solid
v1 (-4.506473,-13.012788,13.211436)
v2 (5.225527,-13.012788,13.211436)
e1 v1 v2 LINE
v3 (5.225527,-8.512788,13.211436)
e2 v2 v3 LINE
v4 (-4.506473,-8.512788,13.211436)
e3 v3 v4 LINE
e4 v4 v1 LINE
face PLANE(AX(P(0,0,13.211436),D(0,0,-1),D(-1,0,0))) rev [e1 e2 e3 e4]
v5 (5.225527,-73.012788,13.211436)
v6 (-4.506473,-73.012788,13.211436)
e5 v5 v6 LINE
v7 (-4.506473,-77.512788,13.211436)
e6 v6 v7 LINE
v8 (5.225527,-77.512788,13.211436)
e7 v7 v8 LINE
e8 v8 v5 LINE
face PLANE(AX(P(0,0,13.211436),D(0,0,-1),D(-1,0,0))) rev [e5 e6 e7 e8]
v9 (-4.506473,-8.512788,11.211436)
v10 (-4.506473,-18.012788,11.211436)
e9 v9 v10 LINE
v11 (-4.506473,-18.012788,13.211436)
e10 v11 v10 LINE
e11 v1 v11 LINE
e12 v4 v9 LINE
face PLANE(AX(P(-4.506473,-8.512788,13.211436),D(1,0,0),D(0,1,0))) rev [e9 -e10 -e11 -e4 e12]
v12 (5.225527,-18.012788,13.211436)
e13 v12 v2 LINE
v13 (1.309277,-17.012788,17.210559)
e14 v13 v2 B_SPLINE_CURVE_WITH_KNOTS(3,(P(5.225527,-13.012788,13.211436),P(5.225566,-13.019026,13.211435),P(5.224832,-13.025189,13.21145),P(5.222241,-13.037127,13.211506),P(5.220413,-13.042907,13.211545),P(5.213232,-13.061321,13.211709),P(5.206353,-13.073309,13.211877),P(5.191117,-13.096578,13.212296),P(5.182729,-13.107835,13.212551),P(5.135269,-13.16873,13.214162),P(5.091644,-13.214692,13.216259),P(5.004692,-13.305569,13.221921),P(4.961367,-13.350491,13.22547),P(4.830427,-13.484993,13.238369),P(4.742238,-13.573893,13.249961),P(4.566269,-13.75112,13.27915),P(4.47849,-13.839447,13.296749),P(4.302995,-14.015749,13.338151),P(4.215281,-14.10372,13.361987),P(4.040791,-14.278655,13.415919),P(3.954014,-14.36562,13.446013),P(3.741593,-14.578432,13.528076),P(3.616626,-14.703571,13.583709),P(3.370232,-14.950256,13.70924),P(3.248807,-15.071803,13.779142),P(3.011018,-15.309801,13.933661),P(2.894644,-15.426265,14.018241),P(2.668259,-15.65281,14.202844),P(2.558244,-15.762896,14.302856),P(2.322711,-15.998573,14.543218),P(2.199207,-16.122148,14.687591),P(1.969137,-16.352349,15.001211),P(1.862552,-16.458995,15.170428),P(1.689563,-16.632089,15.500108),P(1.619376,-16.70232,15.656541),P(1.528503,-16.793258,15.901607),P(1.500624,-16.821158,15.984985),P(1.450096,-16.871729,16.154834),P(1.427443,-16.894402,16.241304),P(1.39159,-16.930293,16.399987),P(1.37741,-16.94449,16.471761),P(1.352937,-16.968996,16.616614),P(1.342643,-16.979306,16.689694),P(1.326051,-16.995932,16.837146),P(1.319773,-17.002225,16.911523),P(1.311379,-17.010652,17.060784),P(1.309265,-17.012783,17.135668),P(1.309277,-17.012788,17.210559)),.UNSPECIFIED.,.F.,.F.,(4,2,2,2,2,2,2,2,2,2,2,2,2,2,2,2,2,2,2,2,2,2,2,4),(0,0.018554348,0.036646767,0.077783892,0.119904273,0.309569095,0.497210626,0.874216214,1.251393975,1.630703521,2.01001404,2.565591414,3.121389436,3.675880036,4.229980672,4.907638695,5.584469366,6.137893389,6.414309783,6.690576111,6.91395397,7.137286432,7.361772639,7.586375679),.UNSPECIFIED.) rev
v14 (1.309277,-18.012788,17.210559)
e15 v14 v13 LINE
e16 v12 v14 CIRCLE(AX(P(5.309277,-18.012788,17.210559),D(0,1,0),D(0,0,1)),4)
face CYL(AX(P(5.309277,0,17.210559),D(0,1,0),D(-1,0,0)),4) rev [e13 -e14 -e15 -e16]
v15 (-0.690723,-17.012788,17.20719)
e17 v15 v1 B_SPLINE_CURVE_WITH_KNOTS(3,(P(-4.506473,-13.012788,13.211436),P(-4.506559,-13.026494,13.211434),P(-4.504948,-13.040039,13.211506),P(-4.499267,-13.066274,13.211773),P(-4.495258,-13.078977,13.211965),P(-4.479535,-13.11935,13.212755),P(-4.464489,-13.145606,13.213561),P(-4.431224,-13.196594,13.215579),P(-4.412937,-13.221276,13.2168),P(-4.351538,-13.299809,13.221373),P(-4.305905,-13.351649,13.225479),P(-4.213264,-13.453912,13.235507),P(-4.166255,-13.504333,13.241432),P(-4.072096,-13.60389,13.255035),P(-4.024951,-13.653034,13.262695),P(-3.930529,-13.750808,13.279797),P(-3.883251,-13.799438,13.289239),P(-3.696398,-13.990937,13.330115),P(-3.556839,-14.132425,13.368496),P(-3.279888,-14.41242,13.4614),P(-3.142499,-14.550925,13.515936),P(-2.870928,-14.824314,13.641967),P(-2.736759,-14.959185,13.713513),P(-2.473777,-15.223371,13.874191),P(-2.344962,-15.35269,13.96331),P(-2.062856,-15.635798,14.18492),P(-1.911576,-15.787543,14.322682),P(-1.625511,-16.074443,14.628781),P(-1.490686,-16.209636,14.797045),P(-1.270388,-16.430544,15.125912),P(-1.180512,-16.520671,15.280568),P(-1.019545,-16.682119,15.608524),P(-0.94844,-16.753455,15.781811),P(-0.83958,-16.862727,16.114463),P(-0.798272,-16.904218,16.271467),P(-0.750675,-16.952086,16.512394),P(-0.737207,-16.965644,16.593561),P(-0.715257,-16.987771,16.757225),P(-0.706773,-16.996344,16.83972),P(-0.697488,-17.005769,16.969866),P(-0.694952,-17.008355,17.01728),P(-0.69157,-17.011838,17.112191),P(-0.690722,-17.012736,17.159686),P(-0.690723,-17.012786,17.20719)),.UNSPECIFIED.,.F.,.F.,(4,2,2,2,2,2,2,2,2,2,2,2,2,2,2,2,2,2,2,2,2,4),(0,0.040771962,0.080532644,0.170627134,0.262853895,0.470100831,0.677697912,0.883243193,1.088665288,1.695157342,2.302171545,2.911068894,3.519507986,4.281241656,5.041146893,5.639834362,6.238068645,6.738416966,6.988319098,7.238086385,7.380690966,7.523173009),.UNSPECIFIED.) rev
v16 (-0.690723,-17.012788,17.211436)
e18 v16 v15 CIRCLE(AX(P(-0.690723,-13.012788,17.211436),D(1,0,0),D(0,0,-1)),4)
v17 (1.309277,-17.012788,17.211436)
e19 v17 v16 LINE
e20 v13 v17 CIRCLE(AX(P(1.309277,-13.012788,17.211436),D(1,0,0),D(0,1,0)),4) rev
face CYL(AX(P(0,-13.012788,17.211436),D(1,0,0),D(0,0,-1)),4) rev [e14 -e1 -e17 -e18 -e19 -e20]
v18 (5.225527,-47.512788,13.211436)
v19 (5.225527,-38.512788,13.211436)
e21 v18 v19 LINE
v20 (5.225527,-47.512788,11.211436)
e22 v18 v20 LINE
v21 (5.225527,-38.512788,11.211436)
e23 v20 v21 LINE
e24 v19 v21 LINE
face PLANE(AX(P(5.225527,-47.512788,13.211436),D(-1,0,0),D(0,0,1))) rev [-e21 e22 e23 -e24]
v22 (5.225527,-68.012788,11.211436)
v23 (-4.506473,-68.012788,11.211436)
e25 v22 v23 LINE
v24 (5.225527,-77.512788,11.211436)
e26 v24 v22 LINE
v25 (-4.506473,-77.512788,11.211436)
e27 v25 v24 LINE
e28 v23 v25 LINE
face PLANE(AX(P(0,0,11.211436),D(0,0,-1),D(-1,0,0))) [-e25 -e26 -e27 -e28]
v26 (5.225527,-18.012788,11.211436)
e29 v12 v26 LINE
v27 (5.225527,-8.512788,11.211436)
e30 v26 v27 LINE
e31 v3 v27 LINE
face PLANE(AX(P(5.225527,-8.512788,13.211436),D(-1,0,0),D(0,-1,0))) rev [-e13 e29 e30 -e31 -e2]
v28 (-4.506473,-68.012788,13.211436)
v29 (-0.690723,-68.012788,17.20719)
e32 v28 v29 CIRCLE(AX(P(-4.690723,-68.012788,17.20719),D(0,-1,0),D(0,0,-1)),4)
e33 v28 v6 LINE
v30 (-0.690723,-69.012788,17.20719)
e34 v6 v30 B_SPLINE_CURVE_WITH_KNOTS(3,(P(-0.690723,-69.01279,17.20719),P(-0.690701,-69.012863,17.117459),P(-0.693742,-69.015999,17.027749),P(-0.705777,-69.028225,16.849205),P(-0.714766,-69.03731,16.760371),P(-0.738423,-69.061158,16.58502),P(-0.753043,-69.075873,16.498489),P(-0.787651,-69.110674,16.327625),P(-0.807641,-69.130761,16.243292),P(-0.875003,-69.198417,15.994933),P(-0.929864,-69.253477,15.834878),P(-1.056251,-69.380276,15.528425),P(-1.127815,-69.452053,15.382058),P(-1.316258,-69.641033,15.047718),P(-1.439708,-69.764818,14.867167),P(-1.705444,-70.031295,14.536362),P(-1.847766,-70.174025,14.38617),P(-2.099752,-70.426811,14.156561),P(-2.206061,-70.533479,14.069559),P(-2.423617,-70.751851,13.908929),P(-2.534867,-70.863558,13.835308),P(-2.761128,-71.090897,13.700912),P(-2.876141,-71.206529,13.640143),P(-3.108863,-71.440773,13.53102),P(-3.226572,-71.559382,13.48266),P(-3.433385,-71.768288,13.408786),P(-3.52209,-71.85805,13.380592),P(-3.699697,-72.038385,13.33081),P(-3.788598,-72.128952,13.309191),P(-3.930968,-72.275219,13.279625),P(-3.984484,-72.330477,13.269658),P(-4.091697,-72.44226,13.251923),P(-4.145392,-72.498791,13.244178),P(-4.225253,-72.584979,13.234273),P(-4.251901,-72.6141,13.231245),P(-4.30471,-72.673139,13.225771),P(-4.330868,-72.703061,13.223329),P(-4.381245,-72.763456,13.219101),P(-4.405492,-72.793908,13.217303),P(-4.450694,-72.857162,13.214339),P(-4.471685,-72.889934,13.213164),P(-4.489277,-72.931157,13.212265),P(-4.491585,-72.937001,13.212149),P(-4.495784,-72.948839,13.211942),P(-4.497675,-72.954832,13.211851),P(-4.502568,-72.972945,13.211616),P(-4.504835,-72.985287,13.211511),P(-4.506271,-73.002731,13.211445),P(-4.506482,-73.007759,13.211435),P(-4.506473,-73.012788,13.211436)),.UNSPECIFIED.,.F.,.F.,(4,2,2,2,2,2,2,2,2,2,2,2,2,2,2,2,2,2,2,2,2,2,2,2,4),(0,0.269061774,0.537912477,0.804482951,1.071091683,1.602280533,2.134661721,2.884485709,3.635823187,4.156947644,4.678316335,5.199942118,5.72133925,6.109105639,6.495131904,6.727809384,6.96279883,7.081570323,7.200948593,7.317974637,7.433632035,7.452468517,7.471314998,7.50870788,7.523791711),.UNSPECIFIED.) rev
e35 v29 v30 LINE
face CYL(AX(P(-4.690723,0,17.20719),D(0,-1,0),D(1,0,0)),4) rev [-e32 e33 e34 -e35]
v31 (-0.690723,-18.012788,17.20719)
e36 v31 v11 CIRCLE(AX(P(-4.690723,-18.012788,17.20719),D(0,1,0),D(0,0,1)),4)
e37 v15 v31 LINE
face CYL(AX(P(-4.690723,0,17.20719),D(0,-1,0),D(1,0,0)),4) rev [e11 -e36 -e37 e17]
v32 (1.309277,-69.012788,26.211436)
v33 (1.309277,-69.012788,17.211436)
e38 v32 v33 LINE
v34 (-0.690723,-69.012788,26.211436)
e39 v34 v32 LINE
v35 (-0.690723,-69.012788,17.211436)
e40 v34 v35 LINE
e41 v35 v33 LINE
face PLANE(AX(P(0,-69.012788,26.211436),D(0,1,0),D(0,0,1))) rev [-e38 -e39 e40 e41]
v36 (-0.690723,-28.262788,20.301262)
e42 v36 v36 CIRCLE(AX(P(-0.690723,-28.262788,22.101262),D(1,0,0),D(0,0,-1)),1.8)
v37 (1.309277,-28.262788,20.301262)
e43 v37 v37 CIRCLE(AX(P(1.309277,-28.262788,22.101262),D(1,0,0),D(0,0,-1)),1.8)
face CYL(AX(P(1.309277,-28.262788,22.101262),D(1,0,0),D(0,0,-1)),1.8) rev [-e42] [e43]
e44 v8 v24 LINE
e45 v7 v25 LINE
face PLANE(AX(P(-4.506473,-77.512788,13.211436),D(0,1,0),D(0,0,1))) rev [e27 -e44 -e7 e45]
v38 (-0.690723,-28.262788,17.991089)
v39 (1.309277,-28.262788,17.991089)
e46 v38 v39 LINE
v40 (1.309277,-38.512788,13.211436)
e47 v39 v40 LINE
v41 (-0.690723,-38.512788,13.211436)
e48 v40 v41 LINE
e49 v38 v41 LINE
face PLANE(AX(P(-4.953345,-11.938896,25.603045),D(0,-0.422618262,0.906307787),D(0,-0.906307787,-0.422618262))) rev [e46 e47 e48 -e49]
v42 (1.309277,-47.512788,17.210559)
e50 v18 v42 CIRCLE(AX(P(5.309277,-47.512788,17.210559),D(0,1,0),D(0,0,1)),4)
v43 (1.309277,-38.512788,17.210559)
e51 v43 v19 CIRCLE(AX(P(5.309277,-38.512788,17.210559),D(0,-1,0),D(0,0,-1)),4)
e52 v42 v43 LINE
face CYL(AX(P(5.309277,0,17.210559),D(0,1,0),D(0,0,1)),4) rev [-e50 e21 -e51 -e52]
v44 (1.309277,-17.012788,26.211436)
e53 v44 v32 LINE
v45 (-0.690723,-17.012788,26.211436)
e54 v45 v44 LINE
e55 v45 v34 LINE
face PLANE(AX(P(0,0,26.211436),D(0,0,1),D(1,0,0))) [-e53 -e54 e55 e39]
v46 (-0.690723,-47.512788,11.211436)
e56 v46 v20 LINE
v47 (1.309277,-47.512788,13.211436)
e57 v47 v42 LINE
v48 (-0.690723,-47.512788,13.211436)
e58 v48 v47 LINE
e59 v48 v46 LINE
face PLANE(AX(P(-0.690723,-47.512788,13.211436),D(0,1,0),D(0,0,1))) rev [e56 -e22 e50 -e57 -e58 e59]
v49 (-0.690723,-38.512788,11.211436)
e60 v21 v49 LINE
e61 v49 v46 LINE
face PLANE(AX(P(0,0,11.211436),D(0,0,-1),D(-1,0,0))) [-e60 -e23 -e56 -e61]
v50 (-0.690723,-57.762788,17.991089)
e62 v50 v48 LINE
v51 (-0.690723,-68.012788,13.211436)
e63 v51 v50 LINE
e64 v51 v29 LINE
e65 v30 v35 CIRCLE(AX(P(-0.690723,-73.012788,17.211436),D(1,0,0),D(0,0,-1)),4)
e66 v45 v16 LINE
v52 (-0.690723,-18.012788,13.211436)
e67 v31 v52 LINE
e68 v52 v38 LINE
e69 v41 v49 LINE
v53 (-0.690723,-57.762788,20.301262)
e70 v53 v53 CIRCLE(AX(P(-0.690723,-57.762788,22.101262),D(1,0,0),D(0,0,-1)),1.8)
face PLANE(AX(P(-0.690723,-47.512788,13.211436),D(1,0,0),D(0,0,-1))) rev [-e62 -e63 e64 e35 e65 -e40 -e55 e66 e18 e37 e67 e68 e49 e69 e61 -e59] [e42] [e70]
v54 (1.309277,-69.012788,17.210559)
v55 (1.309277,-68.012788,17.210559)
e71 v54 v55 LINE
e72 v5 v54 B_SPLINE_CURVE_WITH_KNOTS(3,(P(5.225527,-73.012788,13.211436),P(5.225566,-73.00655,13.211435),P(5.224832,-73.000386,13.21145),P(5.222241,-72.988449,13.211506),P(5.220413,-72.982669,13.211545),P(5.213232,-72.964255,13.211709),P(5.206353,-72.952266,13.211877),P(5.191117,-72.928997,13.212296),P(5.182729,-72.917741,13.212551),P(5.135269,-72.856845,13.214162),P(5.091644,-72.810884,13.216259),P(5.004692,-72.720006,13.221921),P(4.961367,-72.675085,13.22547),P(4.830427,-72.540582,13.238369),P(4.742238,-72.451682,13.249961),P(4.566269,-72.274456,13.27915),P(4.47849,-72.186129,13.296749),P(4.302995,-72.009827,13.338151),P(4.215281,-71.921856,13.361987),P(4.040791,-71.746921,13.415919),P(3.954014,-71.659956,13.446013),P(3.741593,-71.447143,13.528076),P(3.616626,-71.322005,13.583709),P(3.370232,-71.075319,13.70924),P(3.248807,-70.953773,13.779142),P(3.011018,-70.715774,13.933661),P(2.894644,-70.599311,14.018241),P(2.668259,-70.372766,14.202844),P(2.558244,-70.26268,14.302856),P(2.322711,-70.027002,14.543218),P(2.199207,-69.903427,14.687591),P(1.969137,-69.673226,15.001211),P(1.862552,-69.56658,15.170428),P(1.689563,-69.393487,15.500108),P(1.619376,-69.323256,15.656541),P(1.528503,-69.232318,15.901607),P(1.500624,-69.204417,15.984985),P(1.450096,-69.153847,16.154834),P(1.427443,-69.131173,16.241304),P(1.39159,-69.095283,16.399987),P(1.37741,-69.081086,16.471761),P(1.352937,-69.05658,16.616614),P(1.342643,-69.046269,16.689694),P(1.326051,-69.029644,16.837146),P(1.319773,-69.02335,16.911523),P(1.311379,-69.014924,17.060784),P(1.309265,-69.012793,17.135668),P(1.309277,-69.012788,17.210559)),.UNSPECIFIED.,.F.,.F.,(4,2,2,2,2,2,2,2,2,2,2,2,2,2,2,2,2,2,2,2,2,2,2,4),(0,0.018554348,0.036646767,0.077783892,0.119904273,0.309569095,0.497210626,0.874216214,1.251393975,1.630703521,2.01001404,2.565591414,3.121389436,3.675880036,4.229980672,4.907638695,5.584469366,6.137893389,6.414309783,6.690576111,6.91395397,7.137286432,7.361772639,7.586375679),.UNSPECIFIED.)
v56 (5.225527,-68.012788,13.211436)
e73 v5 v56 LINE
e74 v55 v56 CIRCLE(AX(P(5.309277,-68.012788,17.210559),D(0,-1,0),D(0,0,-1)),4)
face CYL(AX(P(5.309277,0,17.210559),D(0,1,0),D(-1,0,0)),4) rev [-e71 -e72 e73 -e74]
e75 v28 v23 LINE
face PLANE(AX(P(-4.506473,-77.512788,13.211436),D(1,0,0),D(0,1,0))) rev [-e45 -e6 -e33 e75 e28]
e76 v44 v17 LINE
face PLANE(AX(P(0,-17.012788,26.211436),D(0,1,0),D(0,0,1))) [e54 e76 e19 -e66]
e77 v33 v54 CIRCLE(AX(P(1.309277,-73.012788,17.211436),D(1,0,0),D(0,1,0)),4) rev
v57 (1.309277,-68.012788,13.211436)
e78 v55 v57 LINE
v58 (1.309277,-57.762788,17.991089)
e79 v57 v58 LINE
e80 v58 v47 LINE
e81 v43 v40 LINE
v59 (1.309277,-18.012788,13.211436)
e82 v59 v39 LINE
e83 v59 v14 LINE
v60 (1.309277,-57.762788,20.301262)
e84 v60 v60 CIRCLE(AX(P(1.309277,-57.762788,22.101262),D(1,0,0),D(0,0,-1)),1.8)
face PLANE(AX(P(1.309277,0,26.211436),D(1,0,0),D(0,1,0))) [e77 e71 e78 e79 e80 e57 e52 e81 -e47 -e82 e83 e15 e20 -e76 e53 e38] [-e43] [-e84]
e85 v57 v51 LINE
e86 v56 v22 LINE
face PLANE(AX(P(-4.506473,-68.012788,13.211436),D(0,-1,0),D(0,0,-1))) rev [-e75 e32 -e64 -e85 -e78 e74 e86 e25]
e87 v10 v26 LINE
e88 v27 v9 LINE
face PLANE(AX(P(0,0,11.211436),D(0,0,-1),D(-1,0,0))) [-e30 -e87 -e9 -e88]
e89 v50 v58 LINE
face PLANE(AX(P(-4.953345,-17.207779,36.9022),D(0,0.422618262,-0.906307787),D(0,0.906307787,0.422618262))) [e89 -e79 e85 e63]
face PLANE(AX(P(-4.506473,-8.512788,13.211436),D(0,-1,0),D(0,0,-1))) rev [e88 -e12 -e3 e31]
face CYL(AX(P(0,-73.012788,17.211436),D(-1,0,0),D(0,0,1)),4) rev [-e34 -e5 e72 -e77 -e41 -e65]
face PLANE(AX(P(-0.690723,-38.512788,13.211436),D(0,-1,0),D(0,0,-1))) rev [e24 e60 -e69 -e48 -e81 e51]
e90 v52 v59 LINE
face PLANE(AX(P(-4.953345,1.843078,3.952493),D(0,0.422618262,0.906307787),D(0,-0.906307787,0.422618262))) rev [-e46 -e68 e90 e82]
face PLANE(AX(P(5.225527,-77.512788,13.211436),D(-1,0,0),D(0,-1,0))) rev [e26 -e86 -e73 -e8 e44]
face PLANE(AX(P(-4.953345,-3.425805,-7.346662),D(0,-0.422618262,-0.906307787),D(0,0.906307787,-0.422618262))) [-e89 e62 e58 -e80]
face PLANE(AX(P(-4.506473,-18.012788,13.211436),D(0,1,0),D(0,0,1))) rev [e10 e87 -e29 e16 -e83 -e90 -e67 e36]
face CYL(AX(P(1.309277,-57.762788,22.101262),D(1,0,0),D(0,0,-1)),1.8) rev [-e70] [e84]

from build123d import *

# Parameters (mm, degrees)
SKETCH2_W             = 5.91625
SKETCH2_H             = 9
BOSS_EXTRUDE1_DEPTH   = 2
SKETCH2_W_2           = 9.732
SKETCH2_H_2           = 9.5
BOSS_EXTRUDE1_2_DEPTH = 2
BOSS_EXTRUDE1_3_DEPTH = 2
SKETCH3_W             = 2
SKETCH3_H             = 1
BOSS_EXTRUDE2_DEPTH   = 13
FILLET1_R             = 4
CUT_EXTRUDE1_DEPTH    = 83.031058661
M3_CLEARANCE_HOLE2_D  = 3.6


with BuildPart() as part:
    # Sketch2 → Boss-Extrude1 (new body)
    with BuildSketch(Plane.XY.offset(11.211435671)):
        with Locations((2.267401673, -43.012787822)):
            Rectangle(SKETCH2_W, SKETCH2_H)
    extrude(amount=BOSS_EXTRUDE1_DEPTH)



with BuildPart() as body_2:
    # Sketch2 → Boss-Extrude1 2 (new body)
    with BuildSketch(Plane.XY.offset(11.211435671)):
        with Locations((0.359526673, -72.762787822)):
            Rectangle(SKETCH2_W_2, SKETCH2_H_2)
    extrude(amount=BOSS_EXTRUDE1_2_DEPTH)


with BuildPart() as body_3:
    # Sketch2 → Boss-Extrude1 3 (new body)
    with BuildSketch(Plane.XY.offset(11.211435671)):
        with Locations((0.359526673, -13.262787822)):
            Rectangle(SKETCH2_W_2, SKETCH2_H_2)
    extrude(amount=BOSS_EXTRUDE1_3_DEPTH)


with BuildPart() as part_1:
    add(part.part)

    add(body_2.part)  # Boss-Extrude2 merges body 2

    add(body_3.part)  # Boss-Extrude2 merges body 3
    # Sketch3 → Boss-Extrude2 (add)
    with BuildSketch(Plane.XY.offset(13.211435671)):
        Polygon((-0.690723327, -17.012787822), (-0.690723327, -38.512787822), (-0.690723327, -47.512787822), (-0.690723327, -68.012787822), (1.309276673, -68.012787822), (1.309276673, -17.012787822), align=None)
        with Locations((0.309276673, -68.512787822)):
            Rectangle(SKETCH3_W, SKETCH3_H)
    extrude(amount=BOSS_EXTRUDE2_DEPTH)

    # Fillet1
    # the kernel refuses this fillet: 4 mm, written as the material it adds along each edge
    with BuildSketch(Plane(origin=(-0.690723327, -17.012787822, 13.211435671), x_dir=(0, 0, 1), z_dir=(0, -1, 0)), Plane(origin=(-0.690723327, -68.012787822, 13.211435671), x_dir=(0, 0, 1), z_dir=(0, -1, 0))) as fillet1_piece_1:
        with BuildLine():
            CenterArc((3.995754239, 4), FILLET1_R, 182.64012102, 87.35987898)
            Line((0, 3.81575), (0, 0))
            Line((0, 0), (3.995754239, 0))
        make_face()
    extrude(amount=1)
    with BuildSketch(Plane(origin=(1.309276673, -17.012787822, 13.211435671), x_dir=(0, 1, 0), z_dir=(-1, 0, 0))) as fillet1_piece_2:
        with BuildLine():
            CenterArc((FILLET1_R, -FILLET1_R), FILLET1_R, 90, 90)
            Line((0, -FILLET1_R), (0, 0))
            Line((0, 0), (FILLET1_R, 0))
        make_face()
    extrude(amount=2)
    with BuildSketch(Plane(origin=(1.309276673, -17.012787822, 13.211435671), x_dir=(1, 0, 0), z_dir=(0, -1, 0))) as fillet1_piece_3_section:
        with BuildLine():
            CenterArc((FILLET1_R, FILLET1_R), FILLET1_R, 180, 90)
            Line((0, FILLET1_R), (0, 0))
            Line((0, 0), (FILLET1_R, 0))
        make_face()
    fillet1_piece_3 = extrude(amount=1, mode=Mode.PRIVATE)
    fillet1_piece_3 = split(fillet1_piece_3, bisect_by=Plane(origin=(5.225526673, -17.012787822, 13.211435671), z_dir=(-1, 0, 0)), keep=Keep.TOP, mode=Mode.PRIVATE)
    add(fillet1_piece_3)
    with BuildSketch(Plane(origin=(1.309276673, -38.512787822, 13.211435671), x_dir=(1, 0, 0), z_dir=(0, -1, 0))) as fillet1_piece_4_section:
        with BuildLine():
            CenterArc((FILLET1_R, FILLET1_R), FILLET1_R, 180, 90)
            Line((0, FILLET1_R), (0, 0))
            Line((0, 0), (FILLET1_R, 0))
        make_face()
    fillet1_piece_4 = extrude(amount=9, mode=Mode.PRIVATE)
    fillet1_piece_4 = split(fillet1_piece_4, bisect_by=Plane(origin=(5.225526673, -38.512787822, 13.211435671), z_dir=(-1, 0, 0)), keep=Keep.TOP, mode=Mode.PRIVATE)
    add(fillet1_piece_4)
    with BuildSketch(Plane(origin=(1.309276673, -68.012787822, 13.211435671), x_dir=(1, 0, 0), z_dir=(0, -1, 0))) as fillet1_piece_5_section:
        with BuildLine():
            CenterArc((FILLET1_R, FILLET1_R), FILLET1_R, 180, 90)
            Line((0, FILLET1_R), (0, 0))
            Line((0, 0), (FILLET1_R, 0))
        make_face()
    fillet1_piece_5 = extrude(amount=1, mode=Mode.PRIVATE)
    fillet1_piece_5 = split(fillet1_piece_5, bisect_by=Plane(origin=(5.225526673, -68.012787822, 13.211435671), z_dir=(-1, 0, 0)), keep=Keep.TOP, mode=Mode.PRIVATE)
    add(fillet1_piece_5)
    with BuildSketch(Plane(origin=(-0.690723327, -69.012787822, 13.211435671), x_dir=(0, 0, 1), z_dir=(1, 0, 0))) as fillet1_piece_6:
        with BuildLine():
            CenterArc((FILLET1_R, FILLET1_R), FILLET1_R, 180, 90)
            Line((0, FILLET1_R), (0, 0))
            Line((0, 0), (FILLET1_R, 0))
        make_face()
    extrude(amount=2)
    with BuildSketch(Plane(origin=(-0.690723327, -7.023402225, 13.211435671), x_dir=(0, 0, 1), z_dir=(0, -1, 0))) as fillet1_piece_7a_section:
        with BuildLine():
            CenterArc((3.995754239, 4), FILLET1_R, 182.64012102, 87.35987898)
            Line((0, 3.81575), (0, 0))
            Line((0, 0), (3.995754239, 0))
        make_face()
    fillet1_piece_7a = extrude(amount=10.989385597, mode=Mode.PRIVATE)
    fillet1_piece_7a = split(fillet1_piece_7a, bisect_by=Plane(origin=(-0.690723327, -17.012787822, 13.211435671), z_dir=(0, 1, 0)), keep=Keep.TOP, mode=Mode.PRIVATE)
    fillet1_piece_7a = split(fillet1_piece_7a, bisect_by=Plane(origin=(-0.690723327, -8.512787822, 13.211435671), z_dir=(0, -1, 0)), keep=Keep.TOP, mode=Mode.PRIVATE)
    with BuildSketch(Plane(origin=(1.309276673, -17.012787822, 13.211435671), x_dir=(0, 1, 0), z_dir=(-1, 0, 0))) as fillet1_piece_7b_section:
        with BuildLine():
            CenterArc((FILLET1_R, -FILLET1_R), FILLET1_R, 90, 90)
            Line((0, -FILLET1_R), (0, 0))
            Line((0, 0), (FILLET1_R, 0))
        make_face()
    fillet1_piece_7b = extrude(amount=12, mode=Mode.PRIVATE)
    fillet1_piece_7b = split(fillet1_piece_7b, bisect_by=Plane(origin=(-0.690723327, -17.012787822, 13.211435671), z_dir=(-1, 0, 0)), keep=Keep.TOP, mode=Mode.PRIVATE)
    fillet1_piece_7b = split(fillet1_piece_7b, bisect_by=Plane(origin=(-4.506473327, -17.012787822, 13.211435671), z_dir=(1, 0, 0)), keep=Keep.TOP, mode=Mode.PRIVATE)
    fillet1_piece_7 = fillet1_piece_7a & fillet1_piece_7b
    add(fillet1_piece_7)
    with BuildSketch(Plane(origin=(1.309276673, -7.012787822, 13.211435671), x_dir=(1, 0, 0), z_dir=(0, -1, 0))) as fillet1_piece_8a_section:
        with BuildLine():
            CenterArc((FILLET1_R, FILLET1_R), FILLET1_R, 180, 90)
            Line((0, FILLET1_R), (0, 0))
            Line((0, 0), (FILLET1_R, 0))
        make_face()
    fillet1_piece_8a = extrude(amount=11, mode=Mode.PRIVATE)
    fillet1_piece_8a = split(fillet1_piece_8a, bisect_by=Plane(origin=(1.309276673, -17.012787822, 13.211435671), z_dir=(0, 1, 0)), keep=Keep.TOP, mode=Mode.PRIVATE)
    fillet1_piece_8a = split(fillet1_piece_8a, bisect_by=Plane(origin=(1.309276673, -8.512787822, 13.211435671), z_dir=(0, -1, 0)), keep=Keep.TOP, mode=Mode.PRIVATE)
    with BuildSketch(Plane(origin=(11.309276673, -17.012787822, 13.211435671), x_dir=(0, 1, 0), z_dir=(-1, 0, 0))) as fillet1_piece_8b_section:
        with BuildLine():
            CenterArc((FILLET1_R, -FILLET1_R), FILLET1_R, 90, 90)
            Line((0, -FILLET1_R), (0, 0))
            Line((0, 0), (FILLET1_R, 0))
        make_face()
    fillet1_piece_8b = extrude(amount=12, mode=Mode.PRIVATE)
    fillet1_piece_8b = split(fillet1_piece_8b, bisect_by=Plane(origin=(1.309276673, -17.012787822, 13.211435671), z_dir=(1, 0, 0)), keep=Keep.TOP, mode=Mode.PRIVATE)
    fillet1_piece_8b = split(fillet1_piece_8b, bisect_by=Plane(origin=(5.225526673, -17.012787822, 13.211435671), z_dir=(-1, 0, 0)), keep=Keep.TOP, mode=Mode.PRIVATE)
    fillet1_piece_8 = fillet1_piece_8a & fillet1_piece_8b
    add(fillet1_piece_8)
    with BuildSketch(Plane(origin=(-0.690723327, -68.012787822, 13.211435671), x_dir=(0, 0, 1), z_dir=(0, -1, 0))) as fillet1_piece_9a_section:
        with BuildLine():
            CenterArc((3.995754239, 4), FILLET1_R, 182.64012102, 87.35987898)
            Line((0, 3.81575), (0, 0))
            Line((0, 0), (3.995754239, 0))
        make_face()
    fillet1_piece_9a = extrude(amount=10.989385597, mode=Mode.PRIVATE)
    fillet1_piece_9a = split(fillet1_piece_9a, bisect_by=Plane(origin=(-0.690723327, -69.012787822, 13.211435671), z_dir=(0, -1, 0)), keep=Keep.TOP, mode=Mode.PRIVATE)
    fillet1_piece_9a = split(fillet1_piece_9a, bisect_by=Plane(origin=(-0.690723327, -77.512787822, 13.211435671), z_dir=(0, 1, 0)), keep=Keep.TOP, mode=Mode.PRIVATE)
    with BuildSketch(Plane(origin=(-10.690723327, -69.012787822, 13.211435671), x_dir=(0, 0, 1), z_dir=(1, 0, 0))) as fillet1_piece_9b_section:
        with BuildLine():
            CenterArc((FILLET1_R, FILLET1_R), FILLET1_R, 180, 90)
            Line((0, FILLET1_R), (0, 0))
            Line((0, 0), (FILLET1_R, 0))
        make_face()
    fillet1_piece_9b = extrude(amount=12, mode=Mode.PRIVATE)
    fillet1_piece_9b = split(fillet1_piece_9b, bisect_by=Plane(origin=(-0.690723327, -69.012787822, 13.211435671), z_dir=(-1, 0, 0)), keep=Keep.TOP, mode=Mode.PRIVATE)
    fillet1_piece_9b = split(fillet1_piece_9b, bisect_by=Plane(origin=(-4.506473327, -69.012787822, 13.211435671), z_dir=(1, 0, 0)), keep=Keep.TOP, mode=Mode.PRIVATE)
    fillet1_piece_9 = fillet1_piece_9a & fillet1_piece_9b
    add(fillet1_piece_9)
    with BuildSketch(Plane(origin=(-0.690723327, -69.012787822, 13.211435671), x_dir=(0, 0, 1), z_dir=(1, 0, 0))) as fillet1_piece_10a_section:
        with BuildLine():
            CenterArc((FILLET1_R, FILLET1_R), FILLET1_R, 180, 90)
            Line((0, FILLET1_R), (0, 0))
            Line((0, 0), (FILLET1_R, 0))
        make_face()
    fillet1_piece_10a = extrude(amount=12, mode=Mode.PRIVATE)
    fillet1_piece_10a = split(fillet1_piece_10a, bisect_by=Plane(origin=(1.309276673, -69.012787822, 13.211435671), z_dir=(1, 0, 0)), keep=Keep.TOP, mode=Mode.PRIVATE)
    fillet1_piece_10a = split(fillet1_piece_10a, bisect_by=Plane(origin=(5.225526673, -69.012787822, 13.211435671), z_dir=(-1, 0, 0)), keep=Keep.TOP, mode=Mode.PRIVATE)
    with BuildSketch(Plane(origin=(1.309276673, -68.012787822, 13.211435671), x_dir=(1, 0, 0), z_dir=(0, -1, 0))) as fillet1_piece_10b_section:
        with BuildLine():
            CenterArc((FILLET1_R, FILLET1_R), FILLET1_R, 180, 90)
            Line((0, FILLET1_R), (0, 0))
            Line((0, 0), (FILLET1_R, 0))
        make_face()
    fillet1_piece_10b = extrude(amount=11, mode=Mode.PRIVATE)
    fillet1_piece_10b = split(fillet1_piece_10b, bisect_by=Plane(origin=(1.309276673, -69.012787822, 13.211435671), z_dir=(0, -1, 0)), keep=Keep.TOP, mode=Mode.PRIVATE)
    fillet1_piece_10b = split(fillet1_piece_10b, bisect_by=Plane(origin=(1.309276673, -77.512787822, 13.211435671), z_dir=(0, 1, 0)), keep=Keep.TOP, mode=Mode.PRIVATE)
    fillet1_piece_10 = fillet1_piece_10a & fillet1_piece_10b
    add(fillet1_piece_10)

    # Sketch6 → Cut-Extrude1 (cut, through all)
    with BuildSketch(Plane(origin=(1.309276673, 0, 0), x_dir=(0, 0, -1), z_dir=(1, 0, 0))):
        Polygon((-13.211435671, -18.012787822), (-17.991089167, -28.262787822), (-13.211435671, -38.512787822), align=None)
        Polygon((-17.991089167, -57.762787822), (-13.211435671, -47.512787822), (-13.211435671, -68.012787822), align=None)
    extrude(amount=-CUT_EXTRUDE1_DEPTH, mode=Mode.SUBTRACT)

    # M3 Clearance Hole2 (through all)
    with Locations(Plane(origin=(1.309276673, 0, 0), x_dir=(0, 0, -1), z_dir=(1, 0, 0))):
        with Locations((-22.101262419, -28.262787822), (-22.101262419, -57.762787822)):
            Hole(M3_CLEARANCE_HOLE2_D / 2)


solid = part_1.part
